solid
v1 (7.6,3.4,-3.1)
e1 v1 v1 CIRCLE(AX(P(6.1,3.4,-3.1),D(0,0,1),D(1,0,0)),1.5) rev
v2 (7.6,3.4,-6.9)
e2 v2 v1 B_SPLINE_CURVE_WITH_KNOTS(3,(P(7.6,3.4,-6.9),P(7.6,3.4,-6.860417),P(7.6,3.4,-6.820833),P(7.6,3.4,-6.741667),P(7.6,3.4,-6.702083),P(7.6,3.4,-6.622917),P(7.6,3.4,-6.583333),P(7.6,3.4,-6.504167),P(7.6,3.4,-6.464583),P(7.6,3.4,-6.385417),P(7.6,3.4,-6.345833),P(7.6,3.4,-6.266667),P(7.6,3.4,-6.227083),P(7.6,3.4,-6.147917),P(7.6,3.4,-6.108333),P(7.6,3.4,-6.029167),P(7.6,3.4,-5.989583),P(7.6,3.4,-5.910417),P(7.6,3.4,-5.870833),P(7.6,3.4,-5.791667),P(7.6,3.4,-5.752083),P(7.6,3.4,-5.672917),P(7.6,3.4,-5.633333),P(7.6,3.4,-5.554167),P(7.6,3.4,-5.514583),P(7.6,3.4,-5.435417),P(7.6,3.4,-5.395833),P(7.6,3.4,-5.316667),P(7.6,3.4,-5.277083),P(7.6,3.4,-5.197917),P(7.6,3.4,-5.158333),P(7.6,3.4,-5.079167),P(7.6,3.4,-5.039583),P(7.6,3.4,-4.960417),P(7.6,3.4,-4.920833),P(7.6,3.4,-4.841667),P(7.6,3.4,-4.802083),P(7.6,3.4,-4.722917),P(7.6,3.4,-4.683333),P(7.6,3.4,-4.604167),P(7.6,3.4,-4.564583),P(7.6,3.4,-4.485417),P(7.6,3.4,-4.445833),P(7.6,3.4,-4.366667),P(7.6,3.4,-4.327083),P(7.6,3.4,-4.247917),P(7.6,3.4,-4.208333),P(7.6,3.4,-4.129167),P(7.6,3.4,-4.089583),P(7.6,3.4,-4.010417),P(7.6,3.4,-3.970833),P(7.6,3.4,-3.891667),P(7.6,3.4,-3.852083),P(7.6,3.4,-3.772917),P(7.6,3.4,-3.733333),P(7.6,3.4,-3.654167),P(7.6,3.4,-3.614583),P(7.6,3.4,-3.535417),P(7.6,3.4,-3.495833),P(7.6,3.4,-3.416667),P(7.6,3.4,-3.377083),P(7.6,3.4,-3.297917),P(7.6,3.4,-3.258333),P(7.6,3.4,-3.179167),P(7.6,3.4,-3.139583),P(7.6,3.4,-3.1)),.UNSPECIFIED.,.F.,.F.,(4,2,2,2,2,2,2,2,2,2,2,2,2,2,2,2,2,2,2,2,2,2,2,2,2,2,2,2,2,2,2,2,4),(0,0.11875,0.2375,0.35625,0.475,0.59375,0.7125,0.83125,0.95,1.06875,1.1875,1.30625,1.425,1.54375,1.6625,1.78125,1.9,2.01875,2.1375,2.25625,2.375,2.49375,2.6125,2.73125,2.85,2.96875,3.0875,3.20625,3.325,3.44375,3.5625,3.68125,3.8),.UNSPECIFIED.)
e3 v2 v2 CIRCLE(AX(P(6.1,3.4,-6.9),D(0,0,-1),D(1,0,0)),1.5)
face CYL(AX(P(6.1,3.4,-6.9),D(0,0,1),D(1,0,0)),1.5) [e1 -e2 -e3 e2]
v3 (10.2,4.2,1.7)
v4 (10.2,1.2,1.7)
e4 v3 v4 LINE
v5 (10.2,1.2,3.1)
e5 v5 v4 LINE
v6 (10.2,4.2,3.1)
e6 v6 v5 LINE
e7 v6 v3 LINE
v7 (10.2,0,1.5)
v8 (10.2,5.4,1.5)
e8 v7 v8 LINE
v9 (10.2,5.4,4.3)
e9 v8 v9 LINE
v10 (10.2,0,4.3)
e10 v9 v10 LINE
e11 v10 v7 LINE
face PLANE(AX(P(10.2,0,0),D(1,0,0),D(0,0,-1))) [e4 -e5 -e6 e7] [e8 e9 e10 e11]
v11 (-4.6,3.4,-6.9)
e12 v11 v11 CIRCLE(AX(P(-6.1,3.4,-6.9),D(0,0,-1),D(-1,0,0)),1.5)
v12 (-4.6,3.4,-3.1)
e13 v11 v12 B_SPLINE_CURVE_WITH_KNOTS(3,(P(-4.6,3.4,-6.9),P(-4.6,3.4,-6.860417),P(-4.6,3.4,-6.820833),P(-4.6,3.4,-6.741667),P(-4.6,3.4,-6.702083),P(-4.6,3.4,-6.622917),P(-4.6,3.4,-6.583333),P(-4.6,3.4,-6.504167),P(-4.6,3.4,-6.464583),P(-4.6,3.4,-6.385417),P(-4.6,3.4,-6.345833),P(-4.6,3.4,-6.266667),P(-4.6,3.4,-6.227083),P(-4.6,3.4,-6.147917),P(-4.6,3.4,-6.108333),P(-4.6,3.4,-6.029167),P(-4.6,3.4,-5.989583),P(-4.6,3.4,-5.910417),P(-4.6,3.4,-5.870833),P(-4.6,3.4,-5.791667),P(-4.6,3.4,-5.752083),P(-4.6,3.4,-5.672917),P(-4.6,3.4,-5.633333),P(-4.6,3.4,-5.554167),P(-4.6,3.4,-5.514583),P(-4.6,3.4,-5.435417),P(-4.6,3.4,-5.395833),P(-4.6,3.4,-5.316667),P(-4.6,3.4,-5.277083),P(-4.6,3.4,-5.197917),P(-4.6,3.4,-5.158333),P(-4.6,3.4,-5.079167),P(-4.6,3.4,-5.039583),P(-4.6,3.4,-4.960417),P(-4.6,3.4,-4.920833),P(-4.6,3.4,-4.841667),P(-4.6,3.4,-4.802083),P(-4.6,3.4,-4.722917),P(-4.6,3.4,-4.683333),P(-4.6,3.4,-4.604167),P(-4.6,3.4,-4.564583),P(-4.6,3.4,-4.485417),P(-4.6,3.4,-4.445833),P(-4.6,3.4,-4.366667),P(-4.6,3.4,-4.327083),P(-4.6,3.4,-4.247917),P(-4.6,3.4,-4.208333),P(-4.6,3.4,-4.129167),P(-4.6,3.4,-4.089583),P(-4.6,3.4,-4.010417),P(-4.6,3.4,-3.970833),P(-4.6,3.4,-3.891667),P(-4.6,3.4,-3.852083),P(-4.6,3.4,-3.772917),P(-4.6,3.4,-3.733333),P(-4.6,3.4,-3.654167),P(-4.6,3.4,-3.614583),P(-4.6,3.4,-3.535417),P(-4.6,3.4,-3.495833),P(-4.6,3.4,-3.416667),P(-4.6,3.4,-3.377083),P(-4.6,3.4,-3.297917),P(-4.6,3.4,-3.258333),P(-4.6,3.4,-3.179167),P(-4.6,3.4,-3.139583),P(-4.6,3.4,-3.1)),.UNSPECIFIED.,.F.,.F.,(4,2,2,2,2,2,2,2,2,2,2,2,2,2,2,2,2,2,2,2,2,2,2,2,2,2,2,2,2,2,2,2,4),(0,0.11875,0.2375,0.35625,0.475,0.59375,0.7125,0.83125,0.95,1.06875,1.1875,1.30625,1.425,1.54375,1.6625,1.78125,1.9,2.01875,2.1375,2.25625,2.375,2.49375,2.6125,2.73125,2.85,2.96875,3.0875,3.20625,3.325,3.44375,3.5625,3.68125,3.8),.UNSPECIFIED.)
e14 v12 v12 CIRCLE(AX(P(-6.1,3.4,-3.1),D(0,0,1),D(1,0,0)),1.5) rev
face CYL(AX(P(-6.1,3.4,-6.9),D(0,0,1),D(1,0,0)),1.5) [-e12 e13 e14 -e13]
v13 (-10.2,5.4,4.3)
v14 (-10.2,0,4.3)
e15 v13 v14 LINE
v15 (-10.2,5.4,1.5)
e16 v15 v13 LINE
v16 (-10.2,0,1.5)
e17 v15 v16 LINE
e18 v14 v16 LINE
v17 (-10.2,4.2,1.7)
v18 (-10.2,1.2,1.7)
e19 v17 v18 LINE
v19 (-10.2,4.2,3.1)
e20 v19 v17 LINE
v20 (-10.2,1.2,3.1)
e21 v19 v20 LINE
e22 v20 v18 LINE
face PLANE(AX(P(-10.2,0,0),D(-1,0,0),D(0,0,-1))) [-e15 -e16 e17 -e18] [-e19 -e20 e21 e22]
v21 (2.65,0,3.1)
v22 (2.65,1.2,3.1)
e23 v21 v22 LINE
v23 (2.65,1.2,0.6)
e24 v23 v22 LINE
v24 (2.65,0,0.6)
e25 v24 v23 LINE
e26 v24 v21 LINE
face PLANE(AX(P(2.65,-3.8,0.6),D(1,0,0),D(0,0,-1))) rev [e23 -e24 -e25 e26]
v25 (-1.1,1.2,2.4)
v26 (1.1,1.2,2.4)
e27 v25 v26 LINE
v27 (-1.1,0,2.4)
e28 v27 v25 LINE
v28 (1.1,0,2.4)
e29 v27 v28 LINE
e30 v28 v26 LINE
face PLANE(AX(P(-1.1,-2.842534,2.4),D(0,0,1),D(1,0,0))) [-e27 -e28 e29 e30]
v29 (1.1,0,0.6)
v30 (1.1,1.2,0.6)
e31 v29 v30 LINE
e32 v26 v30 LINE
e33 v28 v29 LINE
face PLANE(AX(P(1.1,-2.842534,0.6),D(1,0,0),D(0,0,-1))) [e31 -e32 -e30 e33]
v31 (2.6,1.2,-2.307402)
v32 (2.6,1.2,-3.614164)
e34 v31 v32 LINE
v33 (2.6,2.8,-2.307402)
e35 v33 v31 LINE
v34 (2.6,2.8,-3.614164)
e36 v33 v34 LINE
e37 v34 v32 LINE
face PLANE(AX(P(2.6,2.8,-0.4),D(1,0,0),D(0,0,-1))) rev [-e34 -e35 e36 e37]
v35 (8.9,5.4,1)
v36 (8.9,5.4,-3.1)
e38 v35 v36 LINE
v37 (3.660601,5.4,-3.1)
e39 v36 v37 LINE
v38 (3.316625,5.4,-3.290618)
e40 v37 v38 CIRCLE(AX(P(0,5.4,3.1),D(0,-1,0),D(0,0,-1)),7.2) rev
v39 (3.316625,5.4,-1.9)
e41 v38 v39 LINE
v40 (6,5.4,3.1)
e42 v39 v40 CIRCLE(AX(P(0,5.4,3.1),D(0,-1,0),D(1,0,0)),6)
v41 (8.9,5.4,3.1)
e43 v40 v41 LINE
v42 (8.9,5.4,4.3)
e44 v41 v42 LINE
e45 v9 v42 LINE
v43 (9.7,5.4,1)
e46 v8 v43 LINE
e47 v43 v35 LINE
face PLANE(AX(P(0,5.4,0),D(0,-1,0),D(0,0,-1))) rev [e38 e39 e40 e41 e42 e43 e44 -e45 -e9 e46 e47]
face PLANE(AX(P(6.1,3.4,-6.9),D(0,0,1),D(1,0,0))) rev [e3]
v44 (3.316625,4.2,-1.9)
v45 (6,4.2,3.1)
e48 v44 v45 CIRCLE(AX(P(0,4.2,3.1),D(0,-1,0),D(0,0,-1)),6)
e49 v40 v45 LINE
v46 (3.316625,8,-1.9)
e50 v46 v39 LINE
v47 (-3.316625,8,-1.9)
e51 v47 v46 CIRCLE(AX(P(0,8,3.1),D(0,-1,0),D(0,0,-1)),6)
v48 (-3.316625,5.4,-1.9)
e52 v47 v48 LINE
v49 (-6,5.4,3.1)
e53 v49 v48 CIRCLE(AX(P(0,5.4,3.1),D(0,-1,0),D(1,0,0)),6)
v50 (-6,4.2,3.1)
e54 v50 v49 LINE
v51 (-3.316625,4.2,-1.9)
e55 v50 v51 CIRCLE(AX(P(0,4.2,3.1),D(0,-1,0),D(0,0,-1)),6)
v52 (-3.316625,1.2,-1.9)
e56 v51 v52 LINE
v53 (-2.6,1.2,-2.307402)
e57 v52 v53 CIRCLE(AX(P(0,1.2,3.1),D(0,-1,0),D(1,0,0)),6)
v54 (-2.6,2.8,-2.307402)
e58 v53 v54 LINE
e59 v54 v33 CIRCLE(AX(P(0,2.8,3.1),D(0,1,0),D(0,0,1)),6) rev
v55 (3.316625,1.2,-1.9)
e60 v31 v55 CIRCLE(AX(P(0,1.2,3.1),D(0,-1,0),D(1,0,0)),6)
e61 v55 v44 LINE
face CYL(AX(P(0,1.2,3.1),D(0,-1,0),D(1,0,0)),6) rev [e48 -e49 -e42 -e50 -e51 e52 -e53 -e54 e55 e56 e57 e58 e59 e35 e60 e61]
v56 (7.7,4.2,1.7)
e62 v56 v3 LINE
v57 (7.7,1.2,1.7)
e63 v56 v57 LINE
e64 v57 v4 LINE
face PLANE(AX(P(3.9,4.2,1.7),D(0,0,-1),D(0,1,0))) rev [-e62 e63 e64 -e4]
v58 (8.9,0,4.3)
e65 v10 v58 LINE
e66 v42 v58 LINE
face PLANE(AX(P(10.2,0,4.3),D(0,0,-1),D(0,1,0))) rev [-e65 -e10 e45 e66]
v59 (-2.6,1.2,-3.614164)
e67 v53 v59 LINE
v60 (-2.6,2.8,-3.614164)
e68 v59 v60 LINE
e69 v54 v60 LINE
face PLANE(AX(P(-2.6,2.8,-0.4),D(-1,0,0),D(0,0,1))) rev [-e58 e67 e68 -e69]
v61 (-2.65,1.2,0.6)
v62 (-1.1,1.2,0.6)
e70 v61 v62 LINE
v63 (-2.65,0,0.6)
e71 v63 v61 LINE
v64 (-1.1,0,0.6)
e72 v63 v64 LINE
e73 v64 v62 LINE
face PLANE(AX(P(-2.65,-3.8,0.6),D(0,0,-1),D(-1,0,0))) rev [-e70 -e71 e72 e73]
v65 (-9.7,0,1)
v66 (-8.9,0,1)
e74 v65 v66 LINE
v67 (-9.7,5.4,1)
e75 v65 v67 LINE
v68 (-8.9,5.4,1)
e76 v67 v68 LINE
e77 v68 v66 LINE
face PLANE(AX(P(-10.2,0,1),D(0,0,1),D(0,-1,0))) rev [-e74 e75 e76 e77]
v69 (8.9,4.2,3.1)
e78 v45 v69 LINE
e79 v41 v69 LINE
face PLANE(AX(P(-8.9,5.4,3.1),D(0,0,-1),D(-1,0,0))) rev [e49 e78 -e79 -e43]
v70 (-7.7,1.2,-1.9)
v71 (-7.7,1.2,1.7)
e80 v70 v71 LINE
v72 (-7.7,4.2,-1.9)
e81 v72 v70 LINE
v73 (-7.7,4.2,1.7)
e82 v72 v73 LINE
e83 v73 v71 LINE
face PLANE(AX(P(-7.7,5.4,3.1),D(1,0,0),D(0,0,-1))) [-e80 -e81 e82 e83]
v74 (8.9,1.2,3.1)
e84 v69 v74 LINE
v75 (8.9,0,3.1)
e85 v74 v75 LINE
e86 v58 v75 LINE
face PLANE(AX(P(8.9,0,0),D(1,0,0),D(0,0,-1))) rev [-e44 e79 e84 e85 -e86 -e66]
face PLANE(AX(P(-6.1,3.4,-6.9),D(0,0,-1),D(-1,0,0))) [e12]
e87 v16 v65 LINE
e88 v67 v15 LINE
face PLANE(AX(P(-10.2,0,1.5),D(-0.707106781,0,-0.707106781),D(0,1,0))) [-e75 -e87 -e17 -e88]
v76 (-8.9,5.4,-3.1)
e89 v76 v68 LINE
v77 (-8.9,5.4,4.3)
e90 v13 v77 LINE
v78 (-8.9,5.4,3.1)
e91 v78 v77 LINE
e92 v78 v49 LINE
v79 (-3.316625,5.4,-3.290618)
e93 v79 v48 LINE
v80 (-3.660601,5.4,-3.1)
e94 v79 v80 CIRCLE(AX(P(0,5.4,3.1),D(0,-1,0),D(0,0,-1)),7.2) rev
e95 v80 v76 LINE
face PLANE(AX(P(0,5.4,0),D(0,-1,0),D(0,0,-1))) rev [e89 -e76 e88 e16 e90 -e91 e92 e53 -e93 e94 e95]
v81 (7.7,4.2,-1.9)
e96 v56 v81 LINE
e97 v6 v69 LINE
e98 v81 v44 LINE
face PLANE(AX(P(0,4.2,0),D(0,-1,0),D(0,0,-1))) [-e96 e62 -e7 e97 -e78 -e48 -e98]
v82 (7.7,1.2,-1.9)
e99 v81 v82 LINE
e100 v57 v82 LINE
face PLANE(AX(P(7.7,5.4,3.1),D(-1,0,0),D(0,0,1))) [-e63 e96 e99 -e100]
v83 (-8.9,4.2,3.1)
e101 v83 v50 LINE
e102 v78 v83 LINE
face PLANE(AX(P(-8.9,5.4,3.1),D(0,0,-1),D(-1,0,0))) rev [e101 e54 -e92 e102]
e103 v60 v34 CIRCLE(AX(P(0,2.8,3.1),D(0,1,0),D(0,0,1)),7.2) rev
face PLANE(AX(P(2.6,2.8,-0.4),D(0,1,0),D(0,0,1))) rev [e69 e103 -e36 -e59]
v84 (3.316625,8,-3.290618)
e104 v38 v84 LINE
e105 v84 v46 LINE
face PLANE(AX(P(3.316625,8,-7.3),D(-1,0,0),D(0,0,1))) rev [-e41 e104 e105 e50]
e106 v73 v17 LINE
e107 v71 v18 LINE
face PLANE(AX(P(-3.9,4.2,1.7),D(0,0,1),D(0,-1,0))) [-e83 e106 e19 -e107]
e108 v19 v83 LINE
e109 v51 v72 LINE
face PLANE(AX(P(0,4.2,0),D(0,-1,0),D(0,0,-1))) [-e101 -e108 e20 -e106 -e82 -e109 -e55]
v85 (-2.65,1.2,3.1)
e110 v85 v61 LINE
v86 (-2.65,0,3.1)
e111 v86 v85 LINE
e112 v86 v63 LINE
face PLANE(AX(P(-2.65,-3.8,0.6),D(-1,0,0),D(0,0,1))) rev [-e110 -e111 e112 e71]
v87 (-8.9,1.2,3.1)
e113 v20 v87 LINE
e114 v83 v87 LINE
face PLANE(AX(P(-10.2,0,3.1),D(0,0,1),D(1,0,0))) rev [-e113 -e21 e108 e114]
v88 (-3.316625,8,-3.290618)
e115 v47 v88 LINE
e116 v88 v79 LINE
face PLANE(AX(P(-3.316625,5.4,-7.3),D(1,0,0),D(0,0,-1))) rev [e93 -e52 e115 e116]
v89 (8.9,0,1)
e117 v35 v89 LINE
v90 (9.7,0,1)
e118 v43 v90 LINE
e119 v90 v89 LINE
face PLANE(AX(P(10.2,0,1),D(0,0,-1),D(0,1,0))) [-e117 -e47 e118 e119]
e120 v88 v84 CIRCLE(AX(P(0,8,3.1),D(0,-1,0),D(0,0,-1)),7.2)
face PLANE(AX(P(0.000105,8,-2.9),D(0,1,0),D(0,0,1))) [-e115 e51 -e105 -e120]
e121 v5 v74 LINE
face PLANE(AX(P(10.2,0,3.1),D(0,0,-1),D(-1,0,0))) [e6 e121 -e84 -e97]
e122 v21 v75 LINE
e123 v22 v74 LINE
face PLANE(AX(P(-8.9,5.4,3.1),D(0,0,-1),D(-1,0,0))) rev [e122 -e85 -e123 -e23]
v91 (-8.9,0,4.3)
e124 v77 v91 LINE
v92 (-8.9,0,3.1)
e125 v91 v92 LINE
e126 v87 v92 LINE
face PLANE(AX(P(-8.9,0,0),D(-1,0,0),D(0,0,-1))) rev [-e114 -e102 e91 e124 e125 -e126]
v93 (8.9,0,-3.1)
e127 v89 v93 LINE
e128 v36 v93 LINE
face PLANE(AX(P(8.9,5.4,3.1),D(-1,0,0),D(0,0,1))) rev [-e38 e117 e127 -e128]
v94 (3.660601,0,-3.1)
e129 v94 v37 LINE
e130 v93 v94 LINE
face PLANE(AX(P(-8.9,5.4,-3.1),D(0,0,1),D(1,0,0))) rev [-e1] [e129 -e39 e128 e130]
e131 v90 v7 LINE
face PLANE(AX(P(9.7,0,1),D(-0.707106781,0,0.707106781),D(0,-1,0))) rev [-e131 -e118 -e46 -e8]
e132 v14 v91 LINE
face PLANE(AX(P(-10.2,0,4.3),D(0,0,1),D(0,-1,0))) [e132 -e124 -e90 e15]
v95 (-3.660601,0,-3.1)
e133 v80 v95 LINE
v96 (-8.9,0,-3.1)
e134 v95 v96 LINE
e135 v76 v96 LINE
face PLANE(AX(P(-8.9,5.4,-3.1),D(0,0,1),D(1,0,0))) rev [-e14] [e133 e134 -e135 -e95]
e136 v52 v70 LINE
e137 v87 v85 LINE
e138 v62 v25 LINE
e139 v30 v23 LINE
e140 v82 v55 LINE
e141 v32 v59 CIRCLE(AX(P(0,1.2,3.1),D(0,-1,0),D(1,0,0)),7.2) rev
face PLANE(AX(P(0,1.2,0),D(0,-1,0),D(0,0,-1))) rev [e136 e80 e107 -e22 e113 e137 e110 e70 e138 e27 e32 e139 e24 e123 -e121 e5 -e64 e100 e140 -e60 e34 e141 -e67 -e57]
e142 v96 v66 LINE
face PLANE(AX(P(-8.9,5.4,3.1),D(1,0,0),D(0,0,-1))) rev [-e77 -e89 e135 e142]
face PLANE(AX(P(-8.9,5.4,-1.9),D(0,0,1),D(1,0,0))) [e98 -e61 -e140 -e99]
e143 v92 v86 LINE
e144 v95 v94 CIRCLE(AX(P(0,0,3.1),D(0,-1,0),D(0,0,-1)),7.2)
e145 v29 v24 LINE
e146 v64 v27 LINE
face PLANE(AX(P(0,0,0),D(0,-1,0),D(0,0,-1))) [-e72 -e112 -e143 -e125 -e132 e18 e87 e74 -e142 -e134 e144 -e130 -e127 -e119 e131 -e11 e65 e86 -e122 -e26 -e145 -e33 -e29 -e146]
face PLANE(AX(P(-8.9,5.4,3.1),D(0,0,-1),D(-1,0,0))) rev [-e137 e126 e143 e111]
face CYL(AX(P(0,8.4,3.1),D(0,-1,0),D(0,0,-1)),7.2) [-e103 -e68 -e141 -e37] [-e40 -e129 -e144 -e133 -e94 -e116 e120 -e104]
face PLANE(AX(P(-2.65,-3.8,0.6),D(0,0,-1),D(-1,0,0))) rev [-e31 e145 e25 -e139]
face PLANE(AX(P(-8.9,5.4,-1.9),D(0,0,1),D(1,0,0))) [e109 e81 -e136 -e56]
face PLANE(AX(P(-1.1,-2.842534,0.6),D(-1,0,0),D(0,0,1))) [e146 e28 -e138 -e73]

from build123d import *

# Parameters (mm, degrees)
SKETCH1_W                = 17.8
SKETCH1_H                = 6.2
BOSS_EXTRUDE1_DEPTH      = 5.4
SHELL1_T                 = -1.2
SKETCH2_W                = 6
SKETCH2_H                = 4.2
REVOLVE1_DEPTH           = 8
SKETCH5_W                = 1.864108749
SKETCH5_H                = 2.6
CUT_EXTRUDE1_DEPTH       = 5.4
SKETCH6_W                = 5.2
SKETCH6_H                = 1.6
CUT_EXTRUDE2_DEPTH       = 2.7
SKETCH7_R                = 1.5
BOSS_EXTRUDE2_DEPTH      = 3.8
SKETCH9_W                = 5.3
SKETCH9_H                = 2.5
CUT_EXTRUDE3_DEPTH       = 5
SKETCH12_W               = 1.4
SKETCH12_H               = 3
CUT_EXTRUDE4_DEPTH       = 5
BOSS_EXTRUDE5_DEPTH      = 1.3
CHAMFER1_SIZE            = 0.5
CHAMFER1_OF_MIRROR1_SIZE = 0.5
SKETCH13_W               = 2.2
SKETCH13_H               = 1.8
BOSS_EXTRUDE6_DEPTH      = 1.2


# Read off the part's stored shape, not the designer's step: Revolve1
with BuildPart() as part:
    # Sketch1 → Boss-Extrude1 (new body)
    with BuildSketch(Plane(origin=(0, 0, 0), x_dir=(1, 0, 0), z_dir=(0, 1, 0))):
        Rectangle(SKETCH1_W, SKETCH1_H)
    extrude(amount=BOSS_EXTRUDE1_DEPTH)

    # Shell1
    shell1_openings = [part.faces().sort_by_distance(p)[0] for p in [
        (0, 2.7, 3.1),
    ]]
    offset(amount=SHELL1_T, openings=shell1_openings, kind=Kind.INTERSECTION)

    # Sketch2 → Cut-Revolve1 (revolve, cut)
    with BuildSketch(Plane.XY.offset(3.1)):
        with Locations((3, 3.3)):
            Rectangle(SKETCH2_W, SKETCH2_H)
    revolve(axis=Axis((0, 1.2, 3.1), (0, 1, 0)), mode=Mode.SUBTRACT)

    # Revolve1 outline → Revolve1 (add)
    with BuildSketch(Plane(origin=(0, 0, 0), x_dir=(1, 0, 0), z_dir=(0, 1, 0))):
        with BuildLine():
            Line((-5.180733539, 1.9), (-3.31662479, 1.9))
            ThreePointArc((-3.31662479, 1.9), (0, 2.9), (3.31662479, 1.9))
            Line((3.31662479, 1.9), (5.180733539, 1.9))
            ThreePointArc((5.180733539, 1.9), (0, 4.1), (-5.180733539, 1.9))
        make_face()
    extrude(amount=REVOLVE1_DEPTH)

    # Sketch5 → Cut-Extrude1 (cut)
    with BuildSketch(Plane.XY.offset(-1.9)):
        with Locations((-4.248679165, 6.7)):
            Rectangle(SKETCH5_W, SKETCH5_H)
        with Locations((4.248679165, 6.7)):
            Rectangle(SKETCH5_W, SKETCH5_H)
    extrude(amount=-CUT_EXTRUDE1_DEPTH, mode=Mode.SUBTRACT)

    # Sketch6 → Cut-Extrude2 (cut, symmetric)
    with BuildSketch(Plane(origin=(0, 0, -3.1), x_dir=(-1, 0, 0), z_dir=(0, 0, -1))):
        with Locations((0, 2)):
            Rectangle(SKETCH6_W, SKETCH6_H)
    extrude(amount=CUT_EXTRUDE2_DEPTH, both=True, mode=Mode.SUBTRACT)

    # Sketch7 → Boss-Extrude2 (add)
    with BuildSketch(Plane(origin=(0, 0, -3.1), x_dir=(-1, 0, 0), z_dir=(0, 0, -1))):
        with Locations(Location((6.1, 3.4, 0), (0, 0, 180))):
            Circle(SKETCH7_R)
        with Locations(Location((-6.1, 3.4, 0), (0, 0, 180))):
            Circle(SKETCH7_R)
    extrude(amount=BOSS_EXTRUDE2_DEPTH)

    # Sketch9 → Cut-Extrude3 (cut, symmetric)
    with BuildSketch(Plane(origin=(0, 1.2, 0), x_dir=(1, 0, 0), z_dir=(0, 1, 0))):
        with Locations((0, -1.85)):
            Rectangle(SKETCH9_W, SKETCH9_H)
    extrude(amount=CUT_EXTRUDE3_DEPTH, both=True, mode=Mode.SUBTRACT)

    # Sketch12 → Cut-Extrude4 (cut, symmetric)
    with BuildSketch(Plane(origin=(8.9, 0, 0), x_dir=(0, 0, -1), z_dir=(1, 0, 0))):
        with Locations((-2.4, 2.7)):
            Rectangle(SKETCH12_W, SKETCH12_H)
    cut_extrude4 = extrude(amount=CUT_EXTRUDE4_DEPTH, both=True, mode=Mode.SUBTRACT)

    # Sketch11 → Boss-Extrude5 (add)
    with BuildSketch(Plane(origin=(8.9, 0, 0), x_dir=(0, 0, -1), z_dir=(1, 0, 0))):
        Polygon((-1, 0), (-1, 5.4), (-3.1, 5.4), (-3.1, 4.2), (-1.7, 4.2), (-1.7, 1.2), (-3.1, 1.2), (-3.1, 0), align=None)
        Polygon((-3.1, 4.2), (-3.1, 5.4), (-4.3, 5.4), (-4.3, 0), (-3.1, 0), (-3.1, 1.2), align=None)
    boss_extrude5 = extrude(amount=BOSS_EXTRUDE5_DEPTH)

    # Chamfer1
    chamfer1_edges = [part.edges().sort_by_distance(p)[0] for p in [
        (10.2, 2.7, 1),
    ]]
    chamfer(chamfer1_edges, length=CHAMFER1_SIZE)

    # Mirror1: Cut-Extrude4, Boss-Extrude5 across plane
    add(cut_extrude4.mirror(Plane(origin=(0, 0, 0), x_dir=(0, 0, 1), z_dir=(1, 0, 0))), mode=Mode.SUBTRACT)
    add(boss_extrude5.mirror(Plane(origin=(0, 0, 0), x_dir=(0, 0, 1), z_dir=(1, 0, 0))))

    # Chamfer1 of Mirror1
    chamfer1_of_mirror1_edges = [part.edges().sort_by_distance(p)[0] for p in [
        (-10.2, 2.7, 1),
    ]]
    chamfer(chamfer1_of_mirror1_edges, length=CHAMFER1_OF_MIRROR1_SIZE)

    # Sketch13 → Boss-Extrude6 (add)
    with BuildSketch(Plane(origin=(0, 1.2, 0), x_dir=(1, 0, 0), z_dir=(0, 1, 0))):
        with Locations((0, -1.5)):
            Rectangle(SKETCH13_W, SKETCH13_H)
    extrude(amount=-BOSS_EXTRUDE6_DEPTH)


solid = part.part
